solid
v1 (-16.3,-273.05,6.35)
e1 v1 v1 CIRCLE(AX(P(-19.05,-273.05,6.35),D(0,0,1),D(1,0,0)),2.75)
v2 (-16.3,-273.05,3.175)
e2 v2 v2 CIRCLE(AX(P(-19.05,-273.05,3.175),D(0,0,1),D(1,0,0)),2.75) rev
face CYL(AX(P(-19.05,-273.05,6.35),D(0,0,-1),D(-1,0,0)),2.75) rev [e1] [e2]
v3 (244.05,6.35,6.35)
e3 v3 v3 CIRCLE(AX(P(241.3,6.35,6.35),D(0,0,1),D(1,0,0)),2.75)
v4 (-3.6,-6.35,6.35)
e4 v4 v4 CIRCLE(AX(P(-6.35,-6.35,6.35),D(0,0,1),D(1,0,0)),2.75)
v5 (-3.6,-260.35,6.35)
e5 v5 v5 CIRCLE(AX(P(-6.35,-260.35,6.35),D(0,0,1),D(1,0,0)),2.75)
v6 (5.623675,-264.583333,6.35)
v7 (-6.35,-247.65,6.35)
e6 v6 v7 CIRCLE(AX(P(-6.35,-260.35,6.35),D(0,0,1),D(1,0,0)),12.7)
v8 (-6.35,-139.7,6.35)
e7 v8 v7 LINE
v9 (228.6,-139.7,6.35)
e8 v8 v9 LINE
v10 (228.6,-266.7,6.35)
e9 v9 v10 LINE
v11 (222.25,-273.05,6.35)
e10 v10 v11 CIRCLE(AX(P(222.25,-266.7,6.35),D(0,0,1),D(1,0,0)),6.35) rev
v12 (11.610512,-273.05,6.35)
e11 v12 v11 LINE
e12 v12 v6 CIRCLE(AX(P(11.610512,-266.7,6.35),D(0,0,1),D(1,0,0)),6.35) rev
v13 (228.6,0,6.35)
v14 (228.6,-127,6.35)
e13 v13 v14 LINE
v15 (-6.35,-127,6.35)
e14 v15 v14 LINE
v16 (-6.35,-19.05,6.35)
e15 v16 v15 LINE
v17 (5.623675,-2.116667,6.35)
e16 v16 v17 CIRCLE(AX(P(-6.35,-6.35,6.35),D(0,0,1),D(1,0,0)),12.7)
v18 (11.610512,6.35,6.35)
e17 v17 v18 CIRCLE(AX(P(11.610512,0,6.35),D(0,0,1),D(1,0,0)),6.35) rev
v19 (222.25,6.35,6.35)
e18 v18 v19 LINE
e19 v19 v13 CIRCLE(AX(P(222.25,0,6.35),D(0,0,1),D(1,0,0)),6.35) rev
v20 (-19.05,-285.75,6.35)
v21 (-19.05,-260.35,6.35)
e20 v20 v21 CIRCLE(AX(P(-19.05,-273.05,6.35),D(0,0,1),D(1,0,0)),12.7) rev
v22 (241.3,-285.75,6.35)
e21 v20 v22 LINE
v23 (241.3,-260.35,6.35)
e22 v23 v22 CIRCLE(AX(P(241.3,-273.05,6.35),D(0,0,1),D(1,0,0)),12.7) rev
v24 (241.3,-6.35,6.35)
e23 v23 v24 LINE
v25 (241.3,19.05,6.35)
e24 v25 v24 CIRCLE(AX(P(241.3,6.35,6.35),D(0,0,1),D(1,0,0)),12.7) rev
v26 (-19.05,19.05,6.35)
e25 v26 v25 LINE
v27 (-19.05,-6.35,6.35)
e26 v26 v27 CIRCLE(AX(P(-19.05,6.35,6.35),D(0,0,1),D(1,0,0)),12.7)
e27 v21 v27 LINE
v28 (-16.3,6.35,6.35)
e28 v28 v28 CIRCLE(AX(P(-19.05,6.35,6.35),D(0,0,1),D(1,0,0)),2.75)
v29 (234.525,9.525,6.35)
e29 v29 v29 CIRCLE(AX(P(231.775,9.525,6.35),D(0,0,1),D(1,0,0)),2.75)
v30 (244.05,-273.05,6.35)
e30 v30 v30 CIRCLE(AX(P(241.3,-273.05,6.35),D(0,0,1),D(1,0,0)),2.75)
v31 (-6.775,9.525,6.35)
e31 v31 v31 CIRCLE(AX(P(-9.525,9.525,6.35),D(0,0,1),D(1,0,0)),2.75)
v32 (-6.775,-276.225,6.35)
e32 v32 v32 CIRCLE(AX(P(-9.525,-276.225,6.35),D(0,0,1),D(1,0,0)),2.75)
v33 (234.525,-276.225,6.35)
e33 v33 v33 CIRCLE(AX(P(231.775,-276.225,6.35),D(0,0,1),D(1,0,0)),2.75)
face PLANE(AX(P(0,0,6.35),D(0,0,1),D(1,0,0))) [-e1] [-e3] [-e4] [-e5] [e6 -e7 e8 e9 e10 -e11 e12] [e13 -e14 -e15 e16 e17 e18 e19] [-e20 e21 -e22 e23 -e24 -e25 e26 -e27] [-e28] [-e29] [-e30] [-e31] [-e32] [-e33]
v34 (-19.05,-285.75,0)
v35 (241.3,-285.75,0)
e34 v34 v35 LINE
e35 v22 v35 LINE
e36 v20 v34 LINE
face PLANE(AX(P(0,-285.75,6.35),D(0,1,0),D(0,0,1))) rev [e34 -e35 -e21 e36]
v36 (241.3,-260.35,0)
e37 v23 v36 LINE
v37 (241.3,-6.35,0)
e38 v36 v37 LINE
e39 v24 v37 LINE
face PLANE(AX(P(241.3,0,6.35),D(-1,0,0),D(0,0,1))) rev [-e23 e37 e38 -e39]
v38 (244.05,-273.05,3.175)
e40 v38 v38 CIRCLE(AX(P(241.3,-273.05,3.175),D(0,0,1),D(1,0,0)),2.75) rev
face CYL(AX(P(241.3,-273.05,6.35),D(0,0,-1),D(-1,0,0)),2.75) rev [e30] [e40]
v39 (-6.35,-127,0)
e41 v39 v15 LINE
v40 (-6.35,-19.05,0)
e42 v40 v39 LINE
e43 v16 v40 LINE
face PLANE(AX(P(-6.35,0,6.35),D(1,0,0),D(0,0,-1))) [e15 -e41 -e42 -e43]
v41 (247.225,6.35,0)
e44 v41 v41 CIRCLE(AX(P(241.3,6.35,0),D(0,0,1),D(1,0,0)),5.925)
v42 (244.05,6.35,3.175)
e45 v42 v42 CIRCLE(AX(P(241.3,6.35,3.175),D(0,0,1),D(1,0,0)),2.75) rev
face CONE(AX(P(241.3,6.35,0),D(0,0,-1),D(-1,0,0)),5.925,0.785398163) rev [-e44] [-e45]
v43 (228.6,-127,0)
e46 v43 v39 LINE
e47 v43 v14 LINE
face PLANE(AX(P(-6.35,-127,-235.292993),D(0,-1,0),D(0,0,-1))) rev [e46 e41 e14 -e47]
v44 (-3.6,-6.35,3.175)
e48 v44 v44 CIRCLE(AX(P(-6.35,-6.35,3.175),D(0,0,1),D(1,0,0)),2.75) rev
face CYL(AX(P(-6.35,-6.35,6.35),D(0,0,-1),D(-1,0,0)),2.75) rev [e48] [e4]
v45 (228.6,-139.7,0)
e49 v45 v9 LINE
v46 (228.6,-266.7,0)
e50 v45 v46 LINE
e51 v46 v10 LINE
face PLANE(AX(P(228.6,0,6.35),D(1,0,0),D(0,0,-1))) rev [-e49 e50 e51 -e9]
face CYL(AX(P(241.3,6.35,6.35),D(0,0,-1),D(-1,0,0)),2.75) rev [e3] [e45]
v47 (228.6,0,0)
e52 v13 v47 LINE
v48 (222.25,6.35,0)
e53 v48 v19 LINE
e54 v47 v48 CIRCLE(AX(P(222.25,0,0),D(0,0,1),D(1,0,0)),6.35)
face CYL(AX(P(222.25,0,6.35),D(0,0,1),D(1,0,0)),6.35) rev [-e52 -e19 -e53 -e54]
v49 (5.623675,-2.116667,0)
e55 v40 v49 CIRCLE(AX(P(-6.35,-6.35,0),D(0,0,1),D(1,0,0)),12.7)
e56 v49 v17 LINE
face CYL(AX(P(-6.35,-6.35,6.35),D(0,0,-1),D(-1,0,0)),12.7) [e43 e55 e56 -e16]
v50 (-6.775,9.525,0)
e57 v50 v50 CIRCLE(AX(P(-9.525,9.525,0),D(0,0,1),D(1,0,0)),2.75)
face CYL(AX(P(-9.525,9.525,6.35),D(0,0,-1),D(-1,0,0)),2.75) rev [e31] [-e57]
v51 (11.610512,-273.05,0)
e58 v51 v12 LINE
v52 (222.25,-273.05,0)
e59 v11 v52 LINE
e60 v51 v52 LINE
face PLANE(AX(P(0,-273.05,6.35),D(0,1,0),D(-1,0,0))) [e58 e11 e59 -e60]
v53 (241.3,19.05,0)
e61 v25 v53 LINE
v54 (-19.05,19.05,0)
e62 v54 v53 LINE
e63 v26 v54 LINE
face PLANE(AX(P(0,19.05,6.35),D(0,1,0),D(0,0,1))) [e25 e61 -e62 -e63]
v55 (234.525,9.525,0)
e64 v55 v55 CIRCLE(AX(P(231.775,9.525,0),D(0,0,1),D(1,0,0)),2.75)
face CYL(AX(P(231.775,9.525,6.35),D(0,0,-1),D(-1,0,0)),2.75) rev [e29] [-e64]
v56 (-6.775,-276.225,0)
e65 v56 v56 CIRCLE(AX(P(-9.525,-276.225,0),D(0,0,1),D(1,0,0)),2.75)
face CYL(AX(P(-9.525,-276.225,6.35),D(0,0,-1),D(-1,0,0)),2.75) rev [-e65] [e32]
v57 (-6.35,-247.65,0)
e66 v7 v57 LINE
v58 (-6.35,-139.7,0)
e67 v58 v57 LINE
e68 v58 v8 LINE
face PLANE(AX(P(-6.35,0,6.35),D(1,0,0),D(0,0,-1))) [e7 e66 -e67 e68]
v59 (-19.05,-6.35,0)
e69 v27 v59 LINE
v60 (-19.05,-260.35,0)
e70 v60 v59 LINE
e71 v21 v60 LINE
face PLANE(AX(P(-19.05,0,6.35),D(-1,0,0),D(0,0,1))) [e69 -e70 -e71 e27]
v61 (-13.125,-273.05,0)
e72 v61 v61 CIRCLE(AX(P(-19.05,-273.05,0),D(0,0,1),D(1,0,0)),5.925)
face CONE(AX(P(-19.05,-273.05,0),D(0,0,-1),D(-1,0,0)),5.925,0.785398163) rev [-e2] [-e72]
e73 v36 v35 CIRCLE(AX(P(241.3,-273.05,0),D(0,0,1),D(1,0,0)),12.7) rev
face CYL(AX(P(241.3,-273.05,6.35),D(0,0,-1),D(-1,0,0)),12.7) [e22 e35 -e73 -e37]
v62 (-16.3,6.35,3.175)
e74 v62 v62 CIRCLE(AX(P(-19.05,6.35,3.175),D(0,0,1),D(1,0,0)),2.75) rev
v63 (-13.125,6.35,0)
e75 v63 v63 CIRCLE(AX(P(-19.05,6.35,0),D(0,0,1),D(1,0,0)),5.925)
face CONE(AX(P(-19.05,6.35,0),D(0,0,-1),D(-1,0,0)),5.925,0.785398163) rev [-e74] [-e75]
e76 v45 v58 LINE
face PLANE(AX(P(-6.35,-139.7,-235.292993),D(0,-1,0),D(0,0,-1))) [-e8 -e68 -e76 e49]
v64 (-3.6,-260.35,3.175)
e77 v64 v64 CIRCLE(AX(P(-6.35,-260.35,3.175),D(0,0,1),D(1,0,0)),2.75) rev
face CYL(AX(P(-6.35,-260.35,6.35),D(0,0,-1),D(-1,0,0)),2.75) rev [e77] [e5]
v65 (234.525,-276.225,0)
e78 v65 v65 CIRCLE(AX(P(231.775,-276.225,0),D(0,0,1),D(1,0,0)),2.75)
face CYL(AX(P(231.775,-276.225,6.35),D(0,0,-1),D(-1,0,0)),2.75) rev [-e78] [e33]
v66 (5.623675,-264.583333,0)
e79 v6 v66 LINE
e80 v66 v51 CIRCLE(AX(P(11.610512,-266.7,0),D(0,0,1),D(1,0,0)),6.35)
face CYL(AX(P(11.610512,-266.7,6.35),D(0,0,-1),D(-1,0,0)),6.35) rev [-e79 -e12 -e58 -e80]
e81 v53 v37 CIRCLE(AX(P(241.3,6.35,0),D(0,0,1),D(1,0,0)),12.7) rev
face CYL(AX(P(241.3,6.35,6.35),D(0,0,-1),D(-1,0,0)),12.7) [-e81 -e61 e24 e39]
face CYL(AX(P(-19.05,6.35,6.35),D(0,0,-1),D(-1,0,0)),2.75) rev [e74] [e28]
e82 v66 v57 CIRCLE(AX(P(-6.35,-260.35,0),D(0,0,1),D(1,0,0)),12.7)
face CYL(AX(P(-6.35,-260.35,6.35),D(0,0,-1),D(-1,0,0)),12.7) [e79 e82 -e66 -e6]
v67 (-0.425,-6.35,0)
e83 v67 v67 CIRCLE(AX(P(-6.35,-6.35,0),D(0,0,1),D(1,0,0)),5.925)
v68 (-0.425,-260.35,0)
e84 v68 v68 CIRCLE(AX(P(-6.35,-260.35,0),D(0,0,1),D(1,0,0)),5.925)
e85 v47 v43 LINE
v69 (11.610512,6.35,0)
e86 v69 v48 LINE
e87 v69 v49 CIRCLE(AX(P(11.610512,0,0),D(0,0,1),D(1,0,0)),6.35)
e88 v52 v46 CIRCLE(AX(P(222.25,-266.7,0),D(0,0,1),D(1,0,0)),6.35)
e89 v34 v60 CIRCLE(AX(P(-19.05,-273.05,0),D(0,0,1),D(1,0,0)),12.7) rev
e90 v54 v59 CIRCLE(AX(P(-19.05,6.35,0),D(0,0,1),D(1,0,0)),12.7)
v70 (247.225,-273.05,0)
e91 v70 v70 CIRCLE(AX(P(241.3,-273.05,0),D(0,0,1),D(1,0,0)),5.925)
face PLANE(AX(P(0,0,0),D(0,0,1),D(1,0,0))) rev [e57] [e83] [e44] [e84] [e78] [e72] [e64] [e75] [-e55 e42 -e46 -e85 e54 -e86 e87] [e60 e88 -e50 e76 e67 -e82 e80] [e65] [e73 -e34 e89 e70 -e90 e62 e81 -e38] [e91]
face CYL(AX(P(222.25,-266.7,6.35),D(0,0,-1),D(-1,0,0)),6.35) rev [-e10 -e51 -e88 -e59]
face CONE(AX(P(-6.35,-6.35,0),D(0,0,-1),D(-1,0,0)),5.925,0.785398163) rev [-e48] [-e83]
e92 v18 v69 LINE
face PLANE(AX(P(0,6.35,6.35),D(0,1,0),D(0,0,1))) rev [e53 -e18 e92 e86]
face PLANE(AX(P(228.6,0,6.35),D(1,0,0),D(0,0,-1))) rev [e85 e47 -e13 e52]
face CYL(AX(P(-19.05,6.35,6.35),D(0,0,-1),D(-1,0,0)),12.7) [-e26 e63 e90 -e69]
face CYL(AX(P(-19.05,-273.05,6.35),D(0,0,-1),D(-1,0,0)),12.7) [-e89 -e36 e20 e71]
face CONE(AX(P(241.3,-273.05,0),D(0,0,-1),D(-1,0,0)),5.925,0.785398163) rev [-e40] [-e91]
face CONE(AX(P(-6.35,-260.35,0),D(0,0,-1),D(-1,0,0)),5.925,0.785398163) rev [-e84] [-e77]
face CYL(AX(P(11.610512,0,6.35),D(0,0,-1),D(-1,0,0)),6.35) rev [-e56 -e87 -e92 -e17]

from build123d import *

# Parameters (mm, degrees)
SKETCH1_R           = 2.75
BOSS_EXTRUDE1_DEPTH = 6.35
FILLET1_R           = 6.35
CHAMFER1_SIZE       = 3.175
SKETCH2_W           = 234.95
SKETCH2_H           = 12.7
BOSS_EXTRUDE2_DEPTH = 6.35


with BuildPart() as part:
    # Sketch1 → Boss-Extrude1 (new body)
    with BuildSketch(Plane.XY):
        with BuildLine():
            ThreePointArc((-19.05, 19.05), (-31.75, 6.35), (-19.05, -6.35))
            Line((-19.05, -6.35), (-19.05, -260.35))
            ThreePointArc((-19.05, -260.35), (-31.75, -273.05), (-19.05, -285.75))
            Line((-19.05, -285.75), (241.3, -285.75))
            ThreePointArc((241.3, -285.75), (254, -273.05), (241.3, -260.35))
            Line((241.3, -260.35), (241.3, -6.35))
            ThreePointArc((241.3, -6.35), (254, 6.35), (241.3, 19.05))
            Line((241.3, 19.05), (-19.05, 19.05))
        make_face()
        with Locations((241.3, 6.35)):
            Circle(SKETCH1_R, mode=Mode.SUBTRACT)
        with Locations((-19.05, -273.05)):
            Circle(SKETCH1_R, mode=Mode.SUBTRACT)
        with Locations((-9.525, -276.225)):
            Circle(SKETCH1_R, mode=Mode.SUBTRACT)
        with Locations((231.775, -276.225)):
            Circle(SKETCH1_R, mode=Mode.SUBTRACT)
        with Locations((241.3, -273.05)):
            Circle(SKETCH1_R, mode=Mode.SUBTRACT)
        with BuildLine():
            Line((-6.35, -247.65), (-6.35, -19.05))
            ThreePointArc((-6.35, -19.05), (6.35, -6.35), (-6.35, 6.35))
            Line((-6.35, 6.35), (228.6, 6.35))
            Line((228.6, 6.35), (228.6, -273.05))
            Line((228.6, -273.05), (-6.35, -273.05))
            ThreePointArc((-6.35, -273.05), (6.35, -260.35), (-6.35, -247.65))
        make_face(mode=Mode.SUBTRACT)
        with Locations((-6.35, -6.35)):
            Circle(SKETCH1_R, mode=Mode.SUBTRACT)
        with Locations((-6.35, -260.35)):
            Circle(SKETCH1_R, mode=Mode.SUBTRACT)
        with Locations((-19.05, 6.35)):
            Circle(SKETCH1_R, mode=Mode.SUBTRACT)
        with Locations((-9.525, 9.525)):
            Circle(SKETCH1_R, mode=Mode.SUBTRACT)
        with Locations((231.775, 9.525)):
            Circle(SKETCH1_R, mode=Mode.SUBTRACT)
    extrude(amount=BOSS_EXTRUDE1_DEPTH)

    # Fillet1
    fillet1_edges = [part.edges().sort_by_distance(p)[0] for p in [
        (228.6, -273.05, 3.175),
        (228.6, 6.35, 3.175),
        (-6.35, 6.35, 3.175),
    ]]
    fillet(fillet1_edges, radius=FILLET1_R)
    fillet1_2_edges = [part.edges().sort_by_distance(p)[0] for p in [
        (-6.35, -273.05, 3.175),
    ]]
    fillet(fillet1_2_edges, radius=FILLET1_R)

    # Chamfer1
    chamfer1_edges = [part.edges().sort_by_distance(p)[0] for p in [
        (-21.8, 6.35, 0),
        (-21.8, -273.05, 0),
        (238.55, 6.35, 0),
        (238.55, -273.05, 0),
        (-9.1, -260.35, 0),
        (-9.1, -6.35, 0),
    ]]
    chamfer(chamfer1_edges, length=CHAMFER1_SIZE)

    # Sketch2 → Boss-Extrude2 (add)
    with BuildSketch(Plane.XY.offset(6.35)):
        with Locations((111.125, -133.35)):
            Rectangle(SKETCH2_W, SKETCH2_H)
    extrude(amount=-BOSS_EXTRUDE2_DEPTH)


solid = part.part
